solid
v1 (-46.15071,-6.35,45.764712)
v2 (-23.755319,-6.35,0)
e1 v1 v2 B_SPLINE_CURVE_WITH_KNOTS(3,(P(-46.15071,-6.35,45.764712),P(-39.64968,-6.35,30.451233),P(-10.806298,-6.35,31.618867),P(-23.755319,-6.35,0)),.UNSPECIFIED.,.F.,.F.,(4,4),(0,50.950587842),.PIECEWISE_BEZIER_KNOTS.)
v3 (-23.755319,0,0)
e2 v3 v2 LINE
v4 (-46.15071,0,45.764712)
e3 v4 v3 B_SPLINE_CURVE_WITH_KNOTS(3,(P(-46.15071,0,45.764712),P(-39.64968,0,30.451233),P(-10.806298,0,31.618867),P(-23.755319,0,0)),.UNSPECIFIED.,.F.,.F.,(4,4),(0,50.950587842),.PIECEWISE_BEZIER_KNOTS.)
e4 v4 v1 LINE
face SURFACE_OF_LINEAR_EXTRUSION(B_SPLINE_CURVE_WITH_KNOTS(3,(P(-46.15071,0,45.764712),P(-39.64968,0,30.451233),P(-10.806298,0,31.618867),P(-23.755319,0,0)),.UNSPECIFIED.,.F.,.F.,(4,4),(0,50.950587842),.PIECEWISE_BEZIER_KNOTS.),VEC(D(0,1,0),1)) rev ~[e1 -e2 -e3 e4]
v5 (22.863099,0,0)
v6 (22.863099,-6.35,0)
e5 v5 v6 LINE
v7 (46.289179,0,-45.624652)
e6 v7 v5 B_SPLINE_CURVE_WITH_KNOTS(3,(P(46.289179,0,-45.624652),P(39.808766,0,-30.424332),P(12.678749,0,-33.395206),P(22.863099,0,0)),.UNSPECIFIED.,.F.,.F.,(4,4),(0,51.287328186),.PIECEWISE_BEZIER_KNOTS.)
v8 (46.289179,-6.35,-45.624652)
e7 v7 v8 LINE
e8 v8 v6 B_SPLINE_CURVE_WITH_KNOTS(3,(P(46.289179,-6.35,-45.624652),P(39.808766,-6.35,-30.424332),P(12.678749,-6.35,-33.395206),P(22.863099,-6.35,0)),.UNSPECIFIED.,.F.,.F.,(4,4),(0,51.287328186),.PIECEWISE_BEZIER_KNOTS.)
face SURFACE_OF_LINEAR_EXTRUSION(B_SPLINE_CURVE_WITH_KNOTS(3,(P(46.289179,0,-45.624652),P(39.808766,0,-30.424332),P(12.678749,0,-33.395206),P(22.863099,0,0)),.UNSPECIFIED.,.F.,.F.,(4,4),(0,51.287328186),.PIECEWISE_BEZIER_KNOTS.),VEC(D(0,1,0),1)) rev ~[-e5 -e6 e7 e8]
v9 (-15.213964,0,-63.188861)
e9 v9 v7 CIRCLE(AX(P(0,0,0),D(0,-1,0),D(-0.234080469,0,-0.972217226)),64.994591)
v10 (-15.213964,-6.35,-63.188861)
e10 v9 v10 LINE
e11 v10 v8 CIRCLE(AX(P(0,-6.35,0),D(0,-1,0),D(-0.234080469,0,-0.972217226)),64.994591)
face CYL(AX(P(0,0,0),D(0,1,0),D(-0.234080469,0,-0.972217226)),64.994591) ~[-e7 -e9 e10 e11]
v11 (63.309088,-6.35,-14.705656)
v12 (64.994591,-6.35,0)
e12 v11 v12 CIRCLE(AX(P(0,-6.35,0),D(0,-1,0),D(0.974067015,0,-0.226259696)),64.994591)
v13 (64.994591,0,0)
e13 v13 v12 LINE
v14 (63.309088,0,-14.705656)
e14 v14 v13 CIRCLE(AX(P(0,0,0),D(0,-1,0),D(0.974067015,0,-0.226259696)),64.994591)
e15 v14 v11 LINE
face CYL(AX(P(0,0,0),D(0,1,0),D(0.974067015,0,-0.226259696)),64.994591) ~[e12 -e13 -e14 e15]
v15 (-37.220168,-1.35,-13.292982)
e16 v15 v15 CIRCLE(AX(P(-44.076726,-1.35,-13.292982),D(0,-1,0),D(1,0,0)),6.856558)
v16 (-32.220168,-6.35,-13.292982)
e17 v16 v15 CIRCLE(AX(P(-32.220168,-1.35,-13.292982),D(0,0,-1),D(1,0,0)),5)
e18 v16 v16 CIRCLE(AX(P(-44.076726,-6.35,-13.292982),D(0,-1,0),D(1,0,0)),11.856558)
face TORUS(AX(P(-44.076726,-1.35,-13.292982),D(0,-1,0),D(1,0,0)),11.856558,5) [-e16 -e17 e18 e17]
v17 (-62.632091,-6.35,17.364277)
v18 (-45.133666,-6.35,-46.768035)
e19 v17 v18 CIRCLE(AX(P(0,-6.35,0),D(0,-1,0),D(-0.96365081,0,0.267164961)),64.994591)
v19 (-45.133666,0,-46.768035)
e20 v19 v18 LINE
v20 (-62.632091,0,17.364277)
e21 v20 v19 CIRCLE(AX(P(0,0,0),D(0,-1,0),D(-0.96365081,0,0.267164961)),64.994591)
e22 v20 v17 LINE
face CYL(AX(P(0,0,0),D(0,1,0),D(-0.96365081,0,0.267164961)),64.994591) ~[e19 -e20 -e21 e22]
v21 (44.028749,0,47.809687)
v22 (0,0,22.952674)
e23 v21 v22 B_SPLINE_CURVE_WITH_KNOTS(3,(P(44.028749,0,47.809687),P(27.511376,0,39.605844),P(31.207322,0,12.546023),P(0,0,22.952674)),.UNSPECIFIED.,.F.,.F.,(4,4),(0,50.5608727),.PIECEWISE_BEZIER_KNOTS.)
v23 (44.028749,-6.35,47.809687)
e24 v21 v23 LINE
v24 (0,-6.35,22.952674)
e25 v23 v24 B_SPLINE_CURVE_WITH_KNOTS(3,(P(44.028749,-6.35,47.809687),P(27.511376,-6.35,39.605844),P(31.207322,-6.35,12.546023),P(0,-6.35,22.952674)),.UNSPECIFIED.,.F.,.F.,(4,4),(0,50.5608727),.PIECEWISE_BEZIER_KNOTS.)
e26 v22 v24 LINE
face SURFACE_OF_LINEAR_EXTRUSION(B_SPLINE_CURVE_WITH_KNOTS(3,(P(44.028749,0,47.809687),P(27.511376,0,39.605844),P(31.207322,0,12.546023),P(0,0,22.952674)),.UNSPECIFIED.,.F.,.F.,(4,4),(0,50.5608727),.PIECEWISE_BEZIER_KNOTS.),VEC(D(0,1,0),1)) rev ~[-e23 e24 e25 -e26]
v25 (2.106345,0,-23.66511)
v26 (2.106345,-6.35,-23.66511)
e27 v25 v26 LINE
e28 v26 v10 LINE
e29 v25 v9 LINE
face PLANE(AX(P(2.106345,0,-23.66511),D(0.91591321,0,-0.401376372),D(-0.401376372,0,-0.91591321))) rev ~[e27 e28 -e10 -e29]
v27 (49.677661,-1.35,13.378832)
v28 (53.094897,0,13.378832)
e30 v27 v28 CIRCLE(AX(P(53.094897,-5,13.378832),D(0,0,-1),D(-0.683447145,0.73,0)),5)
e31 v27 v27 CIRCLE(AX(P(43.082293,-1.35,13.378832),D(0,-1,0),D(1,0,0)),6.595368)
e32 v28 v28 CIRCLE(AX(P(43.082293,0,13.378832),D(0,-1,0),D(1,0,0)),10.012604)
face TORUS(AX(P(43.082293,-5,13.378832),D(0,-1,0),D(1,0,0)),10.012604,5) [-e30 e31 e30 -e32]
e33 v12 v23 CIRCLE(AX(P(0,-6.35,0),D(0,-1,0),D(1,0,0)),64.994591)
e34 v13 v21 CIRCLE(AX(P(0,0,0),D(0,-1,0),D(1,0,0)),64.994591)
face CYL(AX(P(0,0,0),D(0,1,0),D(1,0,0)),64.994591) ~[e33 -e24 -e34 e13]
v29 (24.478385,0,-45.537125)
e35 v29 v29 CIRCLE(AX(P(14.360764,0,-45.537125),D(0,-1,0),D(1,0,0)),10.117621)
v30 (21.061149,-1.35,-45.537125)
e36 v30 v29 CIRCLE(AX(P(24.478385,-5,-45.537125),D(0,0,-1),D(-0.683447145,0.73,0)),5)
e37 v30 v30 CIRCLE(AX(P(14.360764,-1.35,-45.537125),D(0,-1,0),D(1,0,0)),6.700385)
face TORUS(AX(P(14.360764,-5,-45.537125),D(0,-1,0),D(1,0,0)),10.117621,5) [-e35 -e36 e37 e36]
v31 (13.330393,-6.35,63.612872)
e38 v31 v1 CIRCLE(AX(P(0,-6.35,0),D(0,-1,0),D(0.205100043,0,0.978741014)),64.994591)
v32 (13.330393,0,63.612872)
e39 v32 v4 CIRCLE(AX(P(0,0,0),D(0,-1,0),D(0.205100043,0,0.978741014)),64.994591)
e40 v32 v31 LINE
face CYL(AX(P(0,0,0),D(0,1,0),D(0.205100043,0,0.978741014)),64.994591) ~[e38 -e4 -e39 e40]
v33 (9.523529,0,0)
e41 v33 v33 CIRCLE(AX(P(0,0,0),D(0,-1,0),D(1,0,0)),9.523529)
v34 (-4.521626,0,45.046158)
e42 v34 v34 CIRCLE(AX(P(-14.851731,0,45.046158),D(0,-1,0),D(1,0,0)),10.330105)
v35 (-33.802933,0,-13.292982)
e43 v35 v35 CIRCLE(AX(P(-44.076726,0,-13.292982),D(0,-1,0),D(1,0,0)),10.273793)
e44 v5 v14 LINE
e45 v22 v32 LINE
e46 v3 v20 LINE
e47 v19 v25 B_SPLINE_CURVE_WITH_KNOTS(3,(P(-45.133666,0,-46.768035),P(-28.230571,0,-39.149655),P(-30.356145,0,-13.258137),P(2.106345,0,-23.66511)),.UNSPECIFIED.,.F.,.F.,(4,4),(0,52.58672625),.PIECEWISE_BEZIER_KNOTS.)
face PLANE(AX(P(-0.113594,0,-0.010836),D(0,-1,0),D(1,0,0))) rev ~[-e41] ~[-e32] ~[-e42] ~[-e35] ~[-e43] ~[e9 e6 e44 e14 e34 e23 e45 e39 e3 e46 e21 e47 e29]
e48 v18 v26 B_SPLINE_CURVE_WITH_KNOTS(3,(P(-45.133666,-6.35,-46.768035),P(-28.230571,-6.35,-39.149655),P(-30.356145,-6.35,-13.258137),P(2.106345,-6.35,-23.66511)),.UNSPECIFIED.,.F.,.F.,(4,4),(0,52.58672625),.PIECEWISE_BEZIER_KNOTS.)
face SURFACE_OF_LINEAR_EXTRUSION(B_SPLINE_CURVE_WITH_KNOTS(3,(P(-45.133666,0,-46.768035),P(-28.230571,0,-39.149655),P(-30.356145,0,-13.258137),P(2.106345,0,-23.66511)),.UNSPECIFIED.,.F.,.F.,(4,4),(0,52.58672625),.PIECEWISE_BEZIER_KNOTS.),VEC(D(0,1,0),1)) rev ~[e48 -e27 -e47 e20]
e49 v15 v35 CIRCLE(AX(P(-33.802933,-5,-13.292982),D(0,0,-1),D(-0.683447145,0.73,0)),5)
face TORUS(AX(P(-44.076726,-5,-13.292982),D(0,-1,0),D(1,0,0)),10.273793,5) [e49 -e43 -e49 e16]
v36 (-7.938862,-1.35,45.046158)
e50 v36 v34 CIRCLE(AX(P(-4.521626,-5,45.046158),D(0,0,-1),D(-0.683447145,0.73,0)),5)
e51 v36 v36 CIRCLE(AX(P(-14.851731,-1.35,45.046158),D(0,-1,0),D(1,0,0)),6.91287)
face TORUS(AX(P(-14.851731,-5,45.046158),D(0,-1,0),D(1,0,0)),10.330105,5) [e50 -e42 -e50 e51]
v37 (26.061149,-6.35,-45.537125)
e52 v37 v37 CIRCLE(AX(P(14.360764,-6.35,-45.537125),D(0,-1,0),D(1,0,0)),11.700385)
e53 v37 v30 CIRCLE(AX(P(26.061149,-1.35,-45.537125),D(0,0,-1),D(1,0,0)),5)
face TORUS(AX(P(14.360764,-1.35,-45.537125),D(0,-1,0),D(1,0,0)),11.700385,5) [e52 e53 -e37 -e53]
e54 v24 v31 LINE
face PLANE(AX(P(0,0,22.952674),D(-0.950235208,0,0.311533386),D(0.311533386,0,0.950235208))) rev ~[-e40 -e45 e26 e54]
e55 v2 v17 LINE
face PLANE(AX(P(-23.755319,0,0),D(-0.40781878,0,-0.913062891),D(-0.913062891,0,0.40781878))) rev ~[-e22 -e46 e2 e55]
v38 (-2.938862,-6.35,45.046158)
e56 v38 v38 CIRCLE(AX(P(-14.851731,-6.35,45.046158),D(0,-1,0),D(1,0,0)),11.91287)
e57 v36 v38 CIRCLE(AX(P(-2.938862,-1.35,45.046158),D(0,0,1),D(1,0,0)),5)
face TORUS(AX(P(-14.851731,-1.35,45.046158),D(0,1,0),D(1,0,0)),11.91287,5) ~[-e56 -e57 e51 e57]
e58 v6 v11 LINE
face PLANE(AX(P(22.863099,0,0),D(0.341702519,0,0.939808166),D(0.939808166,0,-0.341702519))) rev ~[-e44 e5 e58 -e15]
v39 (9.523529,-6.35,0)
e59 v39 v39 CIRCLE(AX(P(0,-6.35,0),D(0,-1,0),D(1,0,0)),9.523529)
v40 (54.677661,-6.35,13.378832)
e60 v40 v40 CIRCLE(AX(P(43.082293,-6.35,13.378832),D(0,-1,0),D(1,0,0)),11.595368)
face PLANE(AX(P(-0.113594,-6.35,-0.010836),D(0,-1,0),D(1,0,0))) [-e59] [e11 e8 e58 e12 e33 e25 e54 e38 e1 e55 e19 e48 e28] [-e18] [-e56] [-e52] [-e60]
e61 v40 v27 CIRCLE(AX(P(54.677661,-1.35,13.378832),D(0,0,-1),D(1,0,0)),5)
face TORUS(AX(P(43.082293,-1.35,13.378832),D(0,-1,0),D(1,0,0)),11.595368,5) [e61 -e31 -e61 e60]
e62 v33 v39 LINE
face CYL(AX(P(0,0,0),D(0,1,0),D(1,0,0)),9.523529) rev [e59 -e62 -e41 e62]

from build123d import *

# Parameters (mm, degrees)
F0_R     = 12.5871716163
F0_R_2   = 12.1953483152
F0_R_3   = 12.6822409032
F0_R_4   = 19.9906816782
F0_R_5   = 12.6370181024
F0_R_6   = 9.5235294205
F0_R_7   = 6.7003849176
F0_R_8   = 6.5953683563
F0_R_9   = 6.9128696082
F0_R_10  = 6.8565575186
F1_DEPTH = 6.35
F2_R     = 5
F4_R     = 5
F6_R     = 5
F8_R     = 5


# Not quite as in the source:
# - a fillet or chamfer that OpenCascade refuses, or shapes differently, is made with other operations: its cross-section is extruded or revolved along the edge and cut away or added


with BuildPart() as f1:
    # F0 (on Front) → F1 (new body)
    with BuildSketch(Plane.XZ):
        with BuildLine():
            ThreePointArc((63.3090875557, -14.7056564815), (64.571840502, -7.4009670899), (64.994591311, 0))
            ThreePointArc((64.994591311, 0), (59.5228001423, 26.1023593361), (44.0287494104, 47.8096865189))
            add(Edge.make_bspline(
                [(44.0287494104, 47.8096865189), (27.5113759255, 39.6058435289), (31.2073216603, 12.5460234383), (0, 22.9526739568)],
                knots=[0, 0, 0, 0, 50.5608726998, 50.5608726998, 50.5608726998, 50.5608726998], degree=3))
            Line((0, 22.9526739568), (13.3303934836, 63.6128721978))
            ThreePointArc((13.3303934836, 63.6128721978), (-18.6797347685, 62.2524249219), (-46.1507096662, 45.7647123556))
            add(Edge.make_bspline(
                [(-46.1507096662, 45.7647123556), (-39.6496795631, 30.4512329053), (-10.8062981221, 31.6188670695), (-23.7553194165, 0)],
                knots=[0, 0, 0, 0, 50.9505878418, 50.9505878418, 50.9505878418, 50.9505878418], degree=3))
            Line((-23.7553194165, 0), (-62.6320905617, 17.3642774556))
            ThreePointArc((-62.6320905617, 17.3642774556), (-62.7024955301, -17.1083007333), (-45.133666011, -46.7680349394))
            add(Edge.make_bspline(
                [(-45.133666011, -46.7680349394), (-28.2305709499, -39.1496551166), (-30.3561454639, -13.2581368089), (2.106344793, -23.6651096493)],
                knots=[0, 0, 0, 0, 52.5867262502, 52.5867262502, 52.5867262502, 52.5867262502], degree=3))
            Line((2.106344793, -23.6651096493), (-15.2139644468, -63.1888612454))
            ThreePointArc((-15.2139644468, -63.1888612454), (17.847761713, -62.4960342863), (46.2891786164, -45.6246516995))
            add(Edge.make_bspline(
                [(46.2891786164, -45.6246516995), (39.8087657789, -30.4243322673), (12.678748928, -33.3952058572), (22.8630993515, 0)],
                knots=[0, 0, 0, 0, 51.2873281857, 51.2873281857, 51.2873281857, 51.2873281857], degree=3))
            Line((22.8630993515, 0), (63.3090875557, -14.7056564815))
        make_face()
        with Locations((-44.0767258406, -13.292982243)):
            Circle(F0_R, mode=Mode.SUBTRACT)
        with Locations((14.3607640639, -45.5371253192)):
            Circle(F0_R_2, mode=Mode.SUBTRACT)
        with Locations((-14.8517312482, 45.0461581349)):
            Circle(F0_R_3, mode=Mode.SUBTRACT)
        Circle(F0_R_4, mode=Mode.SUBTRACT)
        with Locations((43.082293123, 13.3788315579)):
            Circle(F0_R_5, mode=Mode.SUBTRACT)
        Circle(F0_R_4)
        Circle(F0_R_6, mode=Mode.SUBTRACT)
        with Locations((14.3607640639, -45.5371253192)):
            Circle(F0_R_2)
        with Locations((14.3607640639, -45.5371253192)):
            Circle(F0_R_7, mode=Mode.SUBTRACT)
        with Locations((43.082293123, 13.3788315579)):
            Circle(F0_R_5)
        with Locations((43.082293123, 13.3788315579)):
            Circle(F0_R_8, mode=Mode.SUBTRACT)
        with Locations((-14.8517312482, 45.0461581349)):
            Circle(F0_R_3)
        with Locations((-14.8517312482, 45.0461581349)):
            Circle(F0_R_9, mode=Mode.SUBTRACT)
        with Locations((-44.0767258406, -13.292982243)):
            Circle(F0_R)
        with Locations((-44.0767258406, -13.292982243)):
            Circle(F0_R_10, mode=Mode.SUBTRACT)
    extrude(amount=F1_DEPTH)

    # F2
    f2_edges = [f1.edges().sort_by_distance(p)[0] for p in [
        (-21.764601, -6.35, 45.046158),
    ]]
    fillet(f2_edges, radius=F2_R)

    # F3: fillet of radius 5 on 1 edges, made by hand

    # F3_s1 → F3_t2 (revolve, cut)
    with BuildSketch(Plane.XY.offset(45.0461581349)):
        with BuildLine():
            ThreePointArc((-7.93886164, -1.35), (-6.3587432222, -0.3497311906), (-4.5216259151, 0))
            Line((-4.5216259151, 0), (-7.93886164, 0))
            Line((-7.93886164, 0), (-7.93886164, -1.35))
        make_face()
    revolve(axis=Axis((-14.8517312482, 0, 45.0461581349), (0, -1, 0)), mode=Mode.SUBTRACT)

    # F4
    f4_edges = [f1.edges().sort_by_distance(p)[0] for p in [
        (7.660379, -6.35, -45.537125),
    ]]
    fillet(f4_edges, radius=F4_R)

    # F5: fillet of radius 5 on 1 edges, made by hand

    # F5_s1 → F5_t2 (revolve, cut)
    with BuildSketch(Plane.XY.offset(-45.5371253192)):
        with BuildLine():
            ThreePointArc((21.0611489815, -1.35), (22.6412673994, -0.3497311906), (24.4783847065, 0))
            Line((24.4783847065, 0), (21.0611489815, 0))
            Line((21.0611489815, 0), (21.0611489815, -1.35))
        make_face()
    revolve(axis=Axis((14.3607640639, 0, -45.5371253192), (0, -1, 0)), mode=Mode.SUBTRACT)

    # F6
    f6_edges = [f1.edges().sort_by_distance(p)[0] for p in [
        (-50.933283, -6.35, -13.292982),
    ]]
    fillet(f6_edges, radius=F6_R)

    # F7: fillet of radius 5 on 1 edges, made by hand

    # F7_s1 → F7_t2 (revolve, cut)
    with BuildSketch(Plane.XY.offset(-13.292982243)):
        with BuildLine():
            ThreePointArc((-37.220168322, -1.35), (-35.6400499041, -0.3497311906), (-33.802932597, 0))
            Line((-33.802932597, 0), (-37.220168322, 0))
            Line((-37.220168322, 0), (-37.220168322, -1.35))
        make_face()
    revolve(axis=Axis((-44.0767258406, 0, -13.292982243), (0, -1, 0)), mode=Mode.SUBTRACT)

    # F8
    f8_edges = [f1.edges().sort_by_distance(p)[0] for p in [
        (36.486925, -6.35, 13.378832),
    ]]
    fillet(f8_edges, radius=F8_R)

    # F9: fillet of radius 5 on 1 edges, made by hand

    # F9_s1 → F9_t2 (revolve, cut)
    with BuildSketch(Plane.XY.offset(13.3788315579)):
        with BuildLine():
            ThreePointArc((49.6776614793, -1.35), (51.2577798972, -0.3497311906), (53.0948972043, 0))
            Line((53.0948972043, 0), (49.6776614793, 0))
            Line((49.6776614793, 0), (49.6776614793, -1.35))
        make_face()
    revolve(axis=Axis((43.082293123, 0, 13.3788315579), (0, -1, 0)), mode=Mode.SUBTRACT)


solid = f1.part
